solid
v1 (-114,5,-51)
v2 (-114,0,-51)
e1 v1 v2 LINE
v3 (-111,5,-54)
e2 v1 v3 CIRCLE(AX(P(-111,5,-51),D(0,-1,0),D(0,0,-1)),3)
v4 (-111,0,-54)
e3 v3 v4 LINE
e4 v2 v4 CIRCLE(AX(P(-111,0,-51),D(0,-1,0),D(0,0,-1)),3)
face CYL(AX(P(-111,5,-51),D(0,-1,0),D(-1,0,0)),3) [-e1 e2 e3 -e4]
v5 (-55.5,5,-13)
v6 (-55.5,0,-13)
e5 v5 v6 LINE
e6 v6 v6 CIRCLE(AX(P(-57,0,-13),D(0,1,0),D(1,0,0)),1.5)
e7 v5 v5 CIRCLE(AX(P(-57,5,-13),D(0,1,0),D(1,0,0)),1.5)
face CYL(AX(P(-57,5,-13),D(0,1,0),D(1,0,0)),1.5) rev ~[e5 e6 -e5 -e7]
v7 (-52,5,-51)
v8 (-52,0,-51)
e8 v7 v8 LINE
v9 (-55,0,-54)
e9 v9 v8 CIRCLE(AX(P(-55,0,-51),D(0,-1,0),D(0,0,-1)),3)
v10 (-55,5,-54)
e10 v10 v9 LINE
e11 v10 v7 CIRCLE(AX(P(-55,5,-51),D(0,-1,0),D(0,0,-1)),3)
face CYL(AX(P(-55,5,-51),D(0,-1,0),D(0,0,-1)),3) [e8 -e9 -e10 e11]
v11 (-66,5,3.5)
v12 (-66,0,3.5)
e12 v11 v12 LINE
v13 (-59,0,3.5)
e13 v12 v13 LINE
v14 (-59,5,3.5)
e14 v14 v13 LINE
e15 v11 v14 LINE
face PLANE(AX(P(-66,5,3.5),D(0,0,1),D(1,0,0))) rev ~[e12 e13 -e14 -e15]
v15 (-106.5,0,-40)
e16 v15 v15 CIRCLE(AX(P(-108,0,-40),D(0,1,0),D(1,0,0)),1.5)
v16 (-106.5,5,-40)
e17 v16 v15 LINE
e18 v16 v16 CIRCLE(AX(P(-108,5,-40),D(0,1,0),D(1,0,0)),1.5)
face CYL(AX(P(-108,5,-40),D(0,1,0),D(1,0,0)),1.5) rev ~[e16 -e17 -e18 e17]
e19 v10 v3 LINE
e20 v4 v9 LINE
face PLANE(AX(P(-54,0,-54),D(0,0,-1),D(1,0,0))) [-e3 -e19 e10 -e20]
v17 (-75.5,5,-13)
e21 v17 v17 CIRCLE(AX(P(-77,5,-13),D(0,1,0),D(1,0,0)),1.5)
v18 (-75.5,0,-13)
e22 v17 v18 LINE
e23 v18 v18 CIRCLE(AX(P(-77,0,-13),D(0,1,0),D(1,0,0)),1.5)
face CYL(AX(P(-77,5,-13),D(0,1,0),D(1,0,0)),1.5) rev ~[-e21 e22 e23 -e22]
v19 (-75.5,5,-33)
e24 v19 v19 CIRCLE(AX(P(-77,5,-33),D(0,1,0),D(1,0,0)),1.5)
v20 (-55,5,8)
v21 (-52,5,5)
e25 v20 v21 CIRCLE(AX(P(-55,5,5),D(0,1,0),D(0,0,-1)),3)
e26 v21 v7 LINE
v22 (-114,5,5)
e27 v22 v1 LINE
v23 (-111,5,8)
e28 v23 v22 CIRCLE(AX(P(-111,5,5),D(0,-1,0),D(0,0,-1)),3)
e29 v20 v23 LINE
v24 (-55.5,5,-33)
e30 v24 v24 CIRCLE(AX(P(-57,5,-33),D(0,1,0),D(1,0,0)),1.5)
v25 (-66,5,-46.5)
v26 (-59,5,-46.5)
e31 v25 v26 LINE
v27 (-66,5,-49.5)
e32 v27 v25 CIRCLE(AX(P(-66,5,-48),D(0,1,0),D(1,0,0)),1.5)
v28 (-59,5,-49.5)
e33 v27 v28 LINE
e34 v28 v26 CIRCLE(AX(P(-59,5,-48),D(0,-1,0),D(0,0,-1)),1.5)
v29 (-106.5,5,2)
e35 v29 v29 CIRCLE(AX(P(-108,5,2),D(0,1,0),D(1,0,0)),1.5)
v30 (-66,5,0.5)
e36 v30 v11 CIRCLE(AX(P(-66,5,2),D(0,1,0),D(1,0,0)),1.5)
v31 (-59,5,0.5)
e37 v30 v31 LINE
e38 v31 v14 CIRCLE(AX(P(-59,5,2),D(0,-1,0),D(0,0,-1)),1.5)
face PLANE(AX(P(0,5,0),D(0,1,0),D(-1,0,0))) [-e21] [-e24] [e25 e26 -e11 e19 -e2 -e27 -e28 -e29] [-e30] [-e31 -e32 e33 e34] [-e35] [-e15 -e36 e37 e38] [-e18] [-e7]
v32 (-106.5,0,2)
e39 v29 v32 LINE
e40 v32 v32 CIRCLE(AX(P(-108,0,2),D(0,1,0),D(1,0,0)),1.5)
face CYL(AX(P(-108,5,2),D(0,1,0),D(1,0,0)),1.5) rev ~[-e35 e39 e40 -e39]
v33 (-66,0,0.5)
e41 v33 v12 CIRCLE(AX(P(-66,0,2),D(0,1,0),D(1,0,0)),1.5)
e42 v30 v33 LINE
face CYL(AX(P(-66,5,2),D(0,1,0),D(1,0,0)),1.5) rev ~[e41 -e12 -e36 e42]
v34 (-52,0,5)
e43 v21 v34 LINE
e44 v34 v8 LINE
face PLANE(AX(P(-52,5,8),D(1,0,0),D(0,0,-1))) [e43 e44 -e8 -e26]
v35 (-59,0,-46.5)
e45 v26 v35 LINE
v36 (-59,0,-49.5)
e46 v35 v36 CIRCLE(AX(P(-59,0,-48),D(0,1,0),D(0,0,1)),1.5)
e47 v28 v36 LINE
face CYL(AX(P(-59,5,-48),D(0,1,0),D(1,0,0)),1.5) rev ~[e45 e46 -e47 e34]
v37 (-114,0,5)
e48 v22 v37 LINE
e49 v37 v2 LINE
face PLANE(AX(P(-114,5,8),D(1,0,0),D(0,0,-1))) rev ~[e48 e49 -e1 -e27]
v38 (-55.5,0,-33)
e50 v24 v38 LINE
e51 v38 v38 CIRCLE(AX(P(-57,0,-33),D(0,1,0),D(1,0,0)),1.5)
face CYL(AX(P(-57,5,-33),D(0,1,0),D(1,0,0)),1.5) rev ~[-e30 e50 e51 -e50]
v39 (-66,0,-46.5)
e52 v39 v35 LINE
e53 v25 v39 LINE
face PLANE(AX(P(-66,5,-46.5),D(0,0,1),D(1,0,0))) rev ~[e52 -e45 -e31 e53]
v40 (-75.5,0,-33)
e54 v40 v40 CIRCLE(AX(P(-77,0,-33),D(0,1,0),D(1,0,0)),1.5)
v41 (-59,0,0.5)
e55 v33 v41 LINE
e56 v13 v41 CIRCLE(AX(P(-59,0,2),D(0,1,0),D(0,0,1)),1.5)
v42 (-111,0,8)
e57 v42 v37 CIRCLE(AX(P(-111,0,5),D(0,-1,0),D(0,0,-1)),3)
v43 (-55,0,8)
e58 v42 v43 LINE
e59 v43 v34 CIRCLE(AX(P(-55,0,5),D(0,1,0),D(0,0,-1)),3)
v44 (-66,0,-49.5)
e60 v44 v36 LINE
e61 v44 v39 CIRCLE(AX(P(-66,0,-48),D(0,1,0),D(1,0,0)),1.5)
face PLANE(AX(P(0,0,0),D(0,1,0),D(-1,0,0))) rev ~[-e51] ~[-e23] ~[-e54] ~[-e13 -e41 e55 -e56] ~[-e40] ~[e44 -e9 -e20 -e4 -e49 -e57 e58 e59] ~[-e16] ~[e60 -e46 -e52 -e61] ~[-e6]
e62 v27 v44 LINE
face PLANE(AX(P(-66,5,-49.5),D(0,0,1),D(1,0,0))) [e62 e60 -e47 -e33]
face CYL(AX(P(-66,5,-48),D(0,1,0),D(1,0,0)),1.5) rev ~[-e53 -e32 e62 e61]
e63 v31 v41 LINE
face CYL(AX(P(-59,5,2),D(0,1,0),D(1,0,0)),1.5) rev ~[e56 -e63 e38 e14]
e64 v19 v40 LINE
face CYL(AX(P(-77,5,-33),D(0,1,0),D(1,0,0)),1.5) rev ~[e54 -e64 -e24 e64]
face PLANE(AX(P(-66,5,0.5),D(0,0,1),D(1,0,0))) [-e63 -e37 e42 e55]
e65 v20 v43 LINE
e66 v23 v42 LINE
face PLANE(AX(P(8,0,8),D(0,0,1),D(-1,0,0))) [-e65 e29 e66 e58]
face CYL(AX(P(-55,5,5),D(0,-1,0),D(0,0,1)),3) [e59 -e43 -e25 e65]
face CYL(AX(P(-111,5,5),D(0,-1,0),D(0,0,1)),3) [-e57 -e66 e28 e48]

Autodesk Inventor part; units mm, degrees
ref_plane "YZ Plane" through (0, 0, 0) normal (1, 0, 0) x (0, 1, 0)
ref_plane "XZ Plane" through (0, 0, 0) normal (0, 1, 0) x (-1, 0, 0)
ref_plane "XY Plane" through (0, 0, 0) normal (0, 0, 1) x (1, 0, 0)
sketch "Sketch1" plane through (0, 0, 0) normal (0, 1, 0) x (-1, 0, 0)
  line L0 (0, 0) -> (46, 0) construction
  line L1 (46, 0) -> (46, -46) construction
  line L2 (46, -46) -> (0, -46) construction
  line L3 (0, -46) -> (0, 0) construction
  circle A0 centre (46, -46) radius 1.5
  circle A1 centre (46, 0) radius 1.5
  circle A2 centre (0, 0) radius 1.5
  circle A3 centre (0, -46) radius 1.5
  line L4 (23, 0) -> (23, -46) construction
  line L5 (-8, 8) -> (54, 8)
  line L6 (54, 8) -> (54, -54)
  line L7 (54, -54) -> (-8, -54)
  line L8 (-8, -54) -> (-8, 8)
  line L9 (-8, 8) -> (54, -54) construction
  line L10 (54, 8) -> (-8, -54) construction
  point P0 (23, -23)
  dimension "d0" = 46
  dimension "d1" = 46
  dimension "d2" = 3
  dimension "d3" = 3
  dimension "d4" = 3
  dimension "d5" = 3
  dimension "d6" = 8
  dimension "d7" = 8
extrude "Extrusion1" add sketch "Sketch1" along normal blind 5
sketch "Sketch2" plane through (0, 5, 0) normal (0, 1, 0) x (1, 0, 0)
  line L0 (-54, -8) -> (8, -8) projected
  line L1 (-54, -8) -> (-114, -8)
  line L2 (-114, -8) -> (-114, 54)
  line L3 (-114, 54) -> (-54, 54)
  line L4 (-54, 54) -> (-54, -8)
  line L5 (8, 54) -> (-54, 54) projected
  point P0 (0, 0)
  dimension "d10" = 60
extrude "Extrusion2" add sketch "Sketch2" against normal blind 5
sketch "Sketch3" plane through (0, 5, 0) normal (0, 1, 0) x (1, 0, 0)
  circle A0 centre (0, 46) radius 1.5 projected
  circle A1 centre (-46, 46) radius 1.5 projected
  line L0 (0, 46) -> (-46, 46) construction
  line L1 (-23, 46) -> (-23, 0) construction
  line L2 (-1.5, 44.5) -> (-44.5, 44.5)
  line L3 (-44.5, 44.5) -> (-44.5, 1.5)
  line L4 (-44.5, 1.5) -> (-1.5, 1.5)
  line L5 (-1.5, 1.5) -> (-1.5, 44.5)
  line L6 (-1.5, 44.5) -> (-44.5, 1.5) construction
  line L7 (-44.5, 44.5) -> (-1.5, 1.5) construction
  line L8 (-114, -8) -> (8, -8) projected
  point P0 (0, 0)
  point P1 (-23, 23)
  dimension "d14" = 43
  dimension "d15" = 43
extrude "Extrusion3" cut sketch "Sketch3" against normal blind 5 contours L5 L4 L3 L2
fillet "Fillet1" radius 1 4 edges at (-44.5, 2.5, -44.5) (-44.5, 2.5, -1.5) (-1.5, 2.5, -1.5) (-1.5, 2.5, -44.5)
sketch "Sketch4" plane through (0, 5, 0) normal (0, 1, 0) x (1, 0, 0)
  circle A0 centre (-108, 40) radius 1.5
  circle A1 centre (-108, -2) radius 1.5
  line L0 (-114, -8) -> (8, -8) projected
  line L1 (-114, 54) -> (-114, -8) projected
  line L2 (8, 54) -> (-114, 54) projected
  circle A2 centre (-59, -2) radius 1.5
  circle A3 centre (-59, 48) radius 1.5
  circle A4 centre (-66, -2) radius 1.5
  circle A5 centre (-66, 48) radius 1.5
  line L3 (-59, -2) -> (-59, 48) construction
  line L4 (-66, 46.5) -> (-59, 46.5)
  line L5 (-66, 49.5) -> (-59, 49.5)
  line L6 (-66, -3.5) -> (-59, -3.5)
  line L7 (-66, -0.5) -> (-59, -0.5)
  line L8 (-66, -2) -> (-66, 48) construction
  line L9 (-59, -2) -> (-66, -2) construction
  line L10 (-59, 48) -> (-66, 48) construction
  point P0 (0, 0)
  dimension "d19" = 6
  dimension "d20" = 3
  dimension "d21" = 6
  dimension "d23" = 3
  dimension "d24" = 6
  dimension "d25" = 14
  dimension "d26" = 3
  dimension "d27" = 3
  dimension "d28" = 50
  dimension "d29" = 6
  dimension "d32" = 7
  dimension "d33" = 3
  dimension "d34" = 3
  dimension "d35" = 7
  dimension "d36" = 42
extrude "Extrusion4" cut sketch "Sketch4" against normal blind 5
fillet "Fillet2" radius 3 4 edges at (8, 2.5, -54) (8, 2.5, 8) (-114, 2.5, 8) (-114, 2.5, -54)
sketch "Sketch5" plane through (0, 5, 0) normal (0, 1, 0) x (1, 0, 0)
  line L0 (-52, 54) -> (8, 54)
  line L1 (8, 54) -> (8, -8)
  line L2 (8, -8) -> (-52, -8)
  line L3 (-52, -8) -> (-52, 54)
  point P0 (0, 0)
extrude "Extrusion5" cut sketch "Sketch5" against normal blind 10
fillet "Fillet3" radius 3 2 edges at (-52, 2.5, 8) (-52, 2.5, -54)
sketch "Sketch6" plane through (0, 5, 0) normal (0, 1, 0) x (1, 0, 0)
  line L0 (-52, 51) -> (-52, -5) projected
  line L1 (-52, 23) -> (-67, 23) construction
  line L2 (-77, 33) -> (-57, 33) construction
  line L3 (-57, 33) -> (-57, 13) construction
  line L4 (-57, 13) -> (-77, 13) construction
  line L5 (-77, 13) -> (-77, 33) construction
  line L6 (-77, 33) -> (-57, 13) construction
  line L7 (-57, 33) -> (-77, 13) construction
  circle A0 centre (-57, 33) radius 1.5
  circle A1 centre (-57, 13) radius 1.5
  circle A2 centre (-77, 13) radius 1.5
  circle A3 centre (-77, 33) radius 1.5
  point P0 (0, 0)
  dimension "d44" = 20
  dimension "d45" = 20
  dimension "d46" = 5
  dimension "d47" = 3
  dimension "d48" = 3
  dimension "d49" = 3
  dimension "d50" = 3
extrude "Extrusion6" cut sketch "Sketch6" against normal blind 10
properties part number "Electronics base"
